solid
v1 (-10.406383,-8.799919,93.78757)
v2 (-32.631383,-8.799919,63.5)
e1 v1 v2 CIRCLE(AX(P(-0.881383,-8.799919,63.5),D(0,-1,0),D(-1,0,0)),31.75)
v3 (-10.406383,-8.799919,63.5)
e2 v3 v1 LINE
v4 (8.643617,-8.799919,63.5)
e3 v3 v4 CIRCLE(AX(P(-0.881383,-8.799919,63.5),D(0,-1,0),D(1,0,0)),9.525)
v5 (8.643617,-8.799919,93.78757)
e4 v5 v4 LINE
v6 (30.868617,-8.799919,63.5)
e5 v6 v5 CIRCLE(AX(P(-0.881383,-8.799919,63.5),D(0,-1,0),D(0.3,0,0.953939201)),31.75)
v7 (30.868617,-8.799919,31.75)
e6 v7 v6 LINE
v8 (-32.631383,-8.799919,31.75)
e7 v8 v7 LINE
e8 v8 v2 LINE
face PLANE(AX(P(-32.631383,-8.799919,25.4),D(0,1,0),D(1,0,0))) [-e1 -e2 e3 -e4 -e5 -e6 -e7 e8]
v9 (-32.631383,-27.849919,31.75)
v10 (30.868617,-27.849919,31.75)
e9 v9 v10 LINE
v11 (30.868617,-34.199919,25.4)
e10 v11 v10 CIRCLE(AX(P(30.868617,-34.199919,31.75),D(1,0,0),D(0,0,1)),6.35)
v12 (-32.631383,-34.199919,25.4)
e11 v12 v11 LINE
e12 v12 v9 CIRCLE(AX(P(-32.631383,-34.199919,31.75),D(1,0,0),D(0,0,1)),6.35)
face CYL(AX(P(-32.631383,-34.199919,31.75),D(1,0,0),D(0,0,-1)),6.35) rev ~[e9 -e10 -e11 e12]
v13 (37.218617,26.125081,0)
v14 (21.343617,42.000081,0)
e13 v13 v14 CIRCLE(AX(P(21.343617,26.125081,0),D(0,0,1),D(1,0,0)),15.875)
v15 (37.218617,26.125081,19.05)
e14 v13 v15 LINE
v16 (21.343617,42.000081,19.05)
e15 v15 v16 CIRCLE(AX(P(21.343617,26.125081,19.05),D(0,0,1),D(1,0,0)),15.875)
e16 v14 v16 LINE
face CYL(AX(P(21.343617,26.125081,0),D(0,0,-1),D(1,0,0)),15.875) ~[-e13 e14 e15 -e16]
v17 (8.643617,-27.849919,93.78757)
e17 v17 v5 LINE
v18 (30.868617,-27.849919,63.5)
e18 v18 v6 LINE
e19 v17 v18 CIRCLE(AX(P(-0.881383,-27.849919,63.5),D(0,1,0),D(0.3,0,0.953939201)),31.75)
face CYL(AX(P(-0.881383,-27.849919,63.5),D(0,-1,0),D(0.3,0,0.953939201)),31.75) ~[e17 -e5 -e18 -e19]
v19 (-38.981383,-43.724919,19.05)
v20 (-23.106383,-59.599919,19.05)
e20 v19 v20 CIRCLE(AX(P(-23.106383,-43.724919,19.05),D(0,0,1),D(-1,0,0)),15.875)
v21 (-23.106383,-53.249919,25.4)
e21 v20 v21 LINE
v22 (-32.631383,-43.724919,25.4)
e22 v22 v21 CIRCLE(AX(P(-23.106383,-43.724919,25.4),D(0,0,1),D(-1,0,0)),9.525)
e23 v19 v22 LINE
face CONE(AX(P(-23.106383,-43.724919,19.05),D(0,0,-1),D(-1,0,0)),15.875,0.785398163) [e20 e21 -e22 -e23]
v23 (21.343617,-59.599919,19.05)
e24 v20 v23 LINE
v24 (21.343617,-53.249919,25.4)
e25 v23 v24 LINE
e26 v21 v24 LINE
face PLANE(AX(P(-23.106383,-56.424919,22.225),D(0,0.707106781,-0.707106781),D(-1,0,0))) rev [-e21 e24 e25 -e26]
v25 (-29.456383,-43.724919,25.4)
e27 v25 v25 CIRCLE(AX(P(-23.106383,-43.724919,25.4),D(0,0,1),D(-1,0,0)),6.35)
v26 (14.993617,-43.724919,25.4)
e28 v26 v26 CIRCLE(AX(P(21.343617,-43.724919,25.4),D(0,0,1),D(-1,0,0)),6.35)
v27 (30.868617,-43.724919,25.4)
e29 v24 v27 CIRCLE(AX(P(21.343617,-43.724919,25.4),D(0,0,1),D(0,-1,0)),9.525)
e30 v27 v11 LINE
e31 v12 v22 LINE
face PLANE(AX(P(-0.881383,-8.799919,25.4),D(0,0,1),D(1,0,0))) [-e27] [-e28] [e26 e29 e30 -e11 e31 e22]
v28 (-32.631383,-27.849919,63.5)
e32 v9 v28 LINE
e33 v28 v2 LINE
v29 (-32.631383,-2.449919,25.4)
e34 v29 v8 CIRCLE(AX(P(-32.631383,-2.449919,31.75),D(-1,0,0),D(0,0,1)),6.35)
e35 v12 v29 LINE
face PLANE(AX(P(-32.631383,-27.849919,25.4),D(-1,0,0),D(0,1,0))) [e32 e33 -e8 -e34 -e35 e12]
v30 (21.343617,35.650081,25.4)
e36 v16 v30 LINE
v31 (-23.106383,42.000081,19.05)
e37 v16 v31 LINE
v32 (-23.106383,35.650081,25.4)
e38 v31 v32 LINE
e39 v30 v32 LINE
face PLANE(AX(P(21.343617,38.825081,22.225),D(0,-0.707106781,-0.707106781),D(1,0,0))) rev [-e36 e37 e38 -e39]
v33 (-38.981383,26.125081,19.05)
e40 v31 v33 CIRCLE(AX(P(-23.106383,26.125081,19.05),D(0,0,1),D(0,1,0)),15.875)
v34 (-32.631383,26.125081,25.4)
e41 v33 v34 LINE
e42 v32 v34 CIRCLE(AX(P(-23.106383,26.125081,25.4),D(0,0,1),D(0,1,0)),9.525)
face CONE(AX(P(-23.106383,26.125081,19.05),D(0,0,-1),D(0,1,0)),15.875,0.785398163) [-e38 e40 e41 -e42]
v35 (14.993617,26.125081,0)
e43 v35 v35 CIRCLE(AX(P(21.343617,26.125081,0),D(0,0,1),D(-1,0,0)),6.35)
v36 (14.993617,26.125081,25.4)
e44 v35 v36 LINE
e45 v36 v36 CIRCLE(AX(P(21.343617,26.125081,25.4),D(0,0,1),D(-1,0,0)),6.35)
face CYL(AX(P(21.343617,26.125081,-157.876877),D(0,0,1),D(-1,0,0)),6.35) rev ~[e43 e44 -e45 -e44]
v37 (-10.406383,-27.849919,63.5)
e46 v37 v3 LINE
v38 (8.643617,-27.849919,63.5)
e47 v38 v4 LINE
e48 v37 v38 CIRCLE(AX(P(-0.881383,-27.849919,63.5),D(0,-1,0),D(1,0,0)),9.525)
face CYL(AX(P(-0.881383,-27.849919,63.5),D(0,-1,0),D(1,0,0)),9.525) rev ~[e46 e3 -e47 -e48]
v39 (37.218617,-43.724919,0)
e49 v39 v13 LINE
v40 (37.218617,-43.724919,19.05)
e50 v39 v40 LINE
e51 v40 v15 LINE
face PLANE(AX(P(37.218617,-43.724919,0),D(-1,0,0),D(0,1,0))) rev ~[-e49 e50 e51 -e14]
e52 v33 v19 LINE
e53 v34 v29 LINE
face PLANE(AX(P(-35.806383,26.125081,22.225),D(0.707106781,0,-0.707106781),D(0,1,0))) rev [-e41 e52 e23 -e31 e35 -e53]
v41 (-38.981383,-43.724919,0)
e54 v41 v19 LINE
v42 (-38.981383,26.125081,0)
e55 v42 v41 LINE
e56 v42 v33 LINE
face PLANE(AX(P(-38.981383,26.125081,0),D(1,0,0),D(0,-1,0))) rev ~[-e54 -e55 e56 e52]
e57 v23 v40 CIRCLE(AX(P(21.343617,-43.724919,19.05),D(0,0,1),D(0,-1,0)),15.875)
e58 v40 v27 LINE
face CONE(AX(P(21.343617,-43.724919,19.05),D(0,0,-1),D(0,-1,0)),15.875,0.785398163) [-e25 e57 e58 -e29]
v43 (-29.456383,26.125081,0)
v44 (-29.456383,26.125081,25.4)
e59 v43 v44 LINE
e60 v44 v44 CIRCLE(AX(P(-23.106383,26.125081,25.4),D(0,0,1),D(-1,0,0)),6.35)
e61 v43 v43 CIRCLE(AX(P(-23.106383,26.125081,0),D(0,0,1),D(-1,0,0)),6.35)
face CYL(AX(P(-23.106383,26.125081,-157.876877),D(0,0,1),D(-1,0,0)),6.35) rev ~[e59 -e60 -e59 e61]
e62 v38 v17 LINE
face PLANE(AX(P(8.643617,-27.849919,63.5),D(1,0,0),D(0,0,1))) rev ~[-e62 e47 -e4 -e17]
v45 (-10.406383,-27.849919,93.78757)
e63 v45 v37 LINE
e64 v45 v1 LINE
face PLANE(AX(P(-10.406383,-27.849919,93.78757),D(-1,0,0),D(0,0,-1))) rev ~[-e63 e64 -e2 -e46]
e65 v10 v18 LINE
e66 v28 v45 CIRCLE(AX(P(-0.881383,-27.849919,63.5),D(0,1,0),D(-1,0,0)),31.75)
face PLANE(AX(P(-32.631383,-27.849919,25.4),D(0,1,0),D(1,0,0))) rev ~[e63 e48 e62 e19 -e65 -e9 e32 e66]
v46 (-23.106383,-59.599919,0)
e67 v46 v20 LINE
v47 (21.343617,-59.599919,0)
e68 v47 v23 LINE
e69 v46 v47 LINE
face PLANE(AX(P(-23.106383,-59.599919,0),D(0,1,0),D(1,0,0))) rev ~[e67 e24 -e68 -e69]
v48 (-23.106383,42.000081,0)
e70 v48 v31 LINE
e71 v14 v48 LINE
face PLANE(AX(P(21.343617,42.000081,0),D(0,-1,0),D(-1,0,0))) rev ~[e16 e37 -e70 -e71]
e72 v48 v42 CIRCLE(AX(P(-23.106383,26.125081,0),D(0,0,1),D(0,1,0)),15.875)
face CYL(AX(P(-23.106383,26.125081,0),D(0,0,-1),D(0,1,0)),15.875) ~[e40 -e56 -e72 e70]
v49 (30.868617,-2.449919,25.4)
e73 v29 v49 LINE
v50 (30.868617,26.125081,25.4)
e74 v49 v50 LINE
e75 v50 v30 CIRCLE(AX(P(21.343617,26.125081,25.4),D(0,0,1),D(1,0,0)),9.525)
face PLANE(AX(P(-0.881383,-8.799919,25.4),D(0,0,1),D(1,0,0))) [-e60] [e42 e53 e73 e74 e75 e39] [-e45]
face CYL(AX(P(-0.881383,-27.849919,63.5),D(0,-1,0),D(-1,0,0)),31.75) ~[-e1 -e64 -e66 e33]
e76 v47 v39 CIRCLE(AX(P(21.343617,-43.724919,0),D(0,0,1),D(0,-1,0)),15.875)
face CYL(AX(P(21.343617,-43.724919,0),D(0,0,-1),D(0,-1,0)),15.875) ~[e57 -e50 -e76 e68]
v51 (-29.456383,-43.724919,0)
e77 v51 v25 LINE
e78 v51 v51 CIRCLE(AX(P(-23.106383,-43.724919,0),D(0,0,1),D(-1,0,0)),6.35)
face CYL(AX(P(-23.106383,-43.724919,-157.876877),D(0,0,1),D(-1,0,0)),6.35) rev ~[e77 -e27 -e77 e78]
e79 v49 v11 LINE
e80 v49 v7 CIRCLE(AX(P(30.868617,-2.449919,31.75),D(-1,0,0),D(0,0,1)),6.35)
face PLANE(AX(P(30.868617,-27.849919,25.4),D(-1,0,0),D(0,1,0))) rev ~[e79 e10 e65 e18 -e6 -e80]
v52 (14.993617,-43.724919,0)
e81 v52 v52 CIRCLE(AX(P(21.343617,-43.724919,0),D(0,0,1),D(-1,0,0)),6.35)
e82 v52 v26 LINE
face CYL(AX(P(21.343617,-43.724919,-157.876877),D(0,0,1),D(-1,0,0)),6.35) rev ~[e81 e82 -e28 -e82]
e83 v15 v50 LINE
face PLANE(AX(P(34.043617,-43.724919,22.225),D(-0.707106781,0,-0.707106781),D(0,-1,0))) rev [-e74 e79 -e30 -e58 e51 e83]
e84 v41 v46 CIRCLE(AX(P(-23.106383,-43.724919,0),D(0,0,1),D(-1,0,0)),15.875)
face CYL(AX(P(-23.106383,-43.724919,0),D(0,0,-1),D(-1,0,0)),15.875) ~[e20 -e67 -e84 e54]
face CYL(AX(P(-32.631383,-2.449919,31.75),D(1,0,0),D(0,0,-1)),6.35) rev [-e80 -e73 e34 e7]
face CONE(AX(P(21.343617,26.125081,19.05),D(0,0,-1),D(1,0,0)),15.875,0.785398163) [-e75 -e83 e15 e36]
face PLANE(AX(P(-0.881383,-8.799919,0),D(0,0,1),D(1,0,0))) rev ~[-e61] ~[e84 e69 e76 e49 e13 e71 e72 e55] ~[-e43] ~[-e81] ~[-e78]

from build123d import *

# Parameters (mm, degrees)
F1_DEPTH = 25.4
F2_SIZE  = 6.35
F3_W     = 63.5
F3_H     = 19.05
F4_DEPTH = 95.25
F6_DEPTH = 25.4
F7_DEPTH = 25.4
F8_D     = 12.7
F9_R     = 6.35


with BuildPart() as f1:
    # F0 (on Top) → F1 (new body)
    with BuildSketch(Plane.XY):
        with BuildLine():
            Line((21.3436168045, 42.000080753), (-23.1063831955, 42.000080753))
            ThreePointArc((-23.1063831955, 42.000080753), (-34.3317033469, 37.3504009043), (-38.9813831955, 26.125080753))
            Line((-38.9813831955, 26.125080753), (-38.9813831955, -43.724919247))
            ThreePointArc((-38.9813831955, -43.724919247), (-34.3317033469, -54.9502393984), (-23.1063831955, -59.599919247))
            Line((-23.1063831955, -59.599919247), (21.3436168045, -59.599919247))
            ThreePointArc((21.3436168045, -59.599919247), (32.5689369558, -54.9502393984), (37.2186168045, -43.724919247))
            Line((37.2186168045, -43.724919247), (37.2186168045, 26.125080753))
            ThreePointArc((37.2186168045, 26.125080753), (32.5689369558, 37.3504009043), (21.3436168045, 42.000080753))
        make_face()
    extrude(amount=F1_DEPTH)

    # F2
    f2_edges = [f1.edges().sort_by_distance(p)[0] for p in [
        (-0.881383, 42.000081, 25.4),
        (37.218617, -8.799919, 25.4),
        (32.568937, 37.350401, 25.4),
        (-34.331703, 37.350401, 25.4),
        (-38.981383, -8.799919, 25.4),
        (-34.331703, -54.950239, 25.4),
        (-0.881383, -59.599919, 25.4),
        (32.568937, -54.950239, 25.4),
    ]]
    chamfer(f2_edges, length=F2_SIZE)

    # F3 (on face) → F4 (join)
    with BuildSketch(Plane.XY.offset(25.4)):
        with Locations((-0.8813831955, -18.324919247)):
            Rectangle(F3_W, F3_H)
    extrude(amount=F4_DEPTH)

    # F5 (on face) → F6 (cut)
    with BuildSketch(Plane.XZ.offset(27.849919247)):
        with BuildLine():
            ThreePointArc((8.6436168045, 93.787569645), (24.7162851553, 82.2835533113), (30.8686168045, 63.5))
            Line((30.8686168045, 63.5), (30.8686168045, 120.65))
            Line((30.8686168045, 120.65), (-32.6313831955, 120.65))
            Line((-32.6313831955, 120.65), (-32.6313831955, 63.5))
            ThreePointArc((-32.6313831955, 63.5), (-26.4790515464, 82.2835533113), (-10.4063831955, 93.787569645))
            ThreePointArc((-10.4063831955, 93.787569645), (-0.8813831955, 95.25), (8.6436168045, 93.787569645))
        make_face()
    extrude(amount=-F6_DEPTH, mode=Mode.SUBTRACT)

    # F5 (on face) → F7 (cut)
    with BuildSketch(Plane.XZ.offset(27.849919247)):
        with BuildLine():
            ThreePointArc((-10.4063831955, 63.5), (-0.8813831955, 53.975), (8.6436168045, 63.5))
            ThreePointArc((8.6436168045, 63.5), (-0.8813831955, 73.025), (-10.4063831955, 63.5))
        make_face()
        with BuildLine():
            Line((8.6436168045, 63.5), (8.6436168045, 93.787569645))
            ThreePointArc((8.6436168045, 93.787569645), (-0.8813831955, 95.25), (-10.4063831955, 93.787569645))
            Line((-10.4063831955, 93.787569645), (-10.4063831955, 63.5))
            ThreePointArc((-10.4063831955, 63.5), (-0.8813831955, 73.025), (8.6436168045, 63.5))
        make_face()
    extrude(amount=-F7_DEPTH, mode=Mode.SUBTRACT)

    # F8 (through all)
    with Locations(Plane(origin=(0, 0, 0), x_dir=(1, 0, 0), z_dir=(0, 0, -1))):
        with Locations((-23.1063831955, 43.724919247), (21.3436168045, 43.724919247), (-23.1063831955, -26.125080753), (21.3436168045, -26.125080753)):
            Hole(F8_D / 2)

    # F9
    f9_edges = [f1.edges().sort_by_distance(p)[0] for p in [
        (-0.881383, -8.799919, 25.4),
        (-0.881383, -27.849919, 25.4),
    ]]
    fillet(f9_edges, radius=F9_R)


solid = f1.part
